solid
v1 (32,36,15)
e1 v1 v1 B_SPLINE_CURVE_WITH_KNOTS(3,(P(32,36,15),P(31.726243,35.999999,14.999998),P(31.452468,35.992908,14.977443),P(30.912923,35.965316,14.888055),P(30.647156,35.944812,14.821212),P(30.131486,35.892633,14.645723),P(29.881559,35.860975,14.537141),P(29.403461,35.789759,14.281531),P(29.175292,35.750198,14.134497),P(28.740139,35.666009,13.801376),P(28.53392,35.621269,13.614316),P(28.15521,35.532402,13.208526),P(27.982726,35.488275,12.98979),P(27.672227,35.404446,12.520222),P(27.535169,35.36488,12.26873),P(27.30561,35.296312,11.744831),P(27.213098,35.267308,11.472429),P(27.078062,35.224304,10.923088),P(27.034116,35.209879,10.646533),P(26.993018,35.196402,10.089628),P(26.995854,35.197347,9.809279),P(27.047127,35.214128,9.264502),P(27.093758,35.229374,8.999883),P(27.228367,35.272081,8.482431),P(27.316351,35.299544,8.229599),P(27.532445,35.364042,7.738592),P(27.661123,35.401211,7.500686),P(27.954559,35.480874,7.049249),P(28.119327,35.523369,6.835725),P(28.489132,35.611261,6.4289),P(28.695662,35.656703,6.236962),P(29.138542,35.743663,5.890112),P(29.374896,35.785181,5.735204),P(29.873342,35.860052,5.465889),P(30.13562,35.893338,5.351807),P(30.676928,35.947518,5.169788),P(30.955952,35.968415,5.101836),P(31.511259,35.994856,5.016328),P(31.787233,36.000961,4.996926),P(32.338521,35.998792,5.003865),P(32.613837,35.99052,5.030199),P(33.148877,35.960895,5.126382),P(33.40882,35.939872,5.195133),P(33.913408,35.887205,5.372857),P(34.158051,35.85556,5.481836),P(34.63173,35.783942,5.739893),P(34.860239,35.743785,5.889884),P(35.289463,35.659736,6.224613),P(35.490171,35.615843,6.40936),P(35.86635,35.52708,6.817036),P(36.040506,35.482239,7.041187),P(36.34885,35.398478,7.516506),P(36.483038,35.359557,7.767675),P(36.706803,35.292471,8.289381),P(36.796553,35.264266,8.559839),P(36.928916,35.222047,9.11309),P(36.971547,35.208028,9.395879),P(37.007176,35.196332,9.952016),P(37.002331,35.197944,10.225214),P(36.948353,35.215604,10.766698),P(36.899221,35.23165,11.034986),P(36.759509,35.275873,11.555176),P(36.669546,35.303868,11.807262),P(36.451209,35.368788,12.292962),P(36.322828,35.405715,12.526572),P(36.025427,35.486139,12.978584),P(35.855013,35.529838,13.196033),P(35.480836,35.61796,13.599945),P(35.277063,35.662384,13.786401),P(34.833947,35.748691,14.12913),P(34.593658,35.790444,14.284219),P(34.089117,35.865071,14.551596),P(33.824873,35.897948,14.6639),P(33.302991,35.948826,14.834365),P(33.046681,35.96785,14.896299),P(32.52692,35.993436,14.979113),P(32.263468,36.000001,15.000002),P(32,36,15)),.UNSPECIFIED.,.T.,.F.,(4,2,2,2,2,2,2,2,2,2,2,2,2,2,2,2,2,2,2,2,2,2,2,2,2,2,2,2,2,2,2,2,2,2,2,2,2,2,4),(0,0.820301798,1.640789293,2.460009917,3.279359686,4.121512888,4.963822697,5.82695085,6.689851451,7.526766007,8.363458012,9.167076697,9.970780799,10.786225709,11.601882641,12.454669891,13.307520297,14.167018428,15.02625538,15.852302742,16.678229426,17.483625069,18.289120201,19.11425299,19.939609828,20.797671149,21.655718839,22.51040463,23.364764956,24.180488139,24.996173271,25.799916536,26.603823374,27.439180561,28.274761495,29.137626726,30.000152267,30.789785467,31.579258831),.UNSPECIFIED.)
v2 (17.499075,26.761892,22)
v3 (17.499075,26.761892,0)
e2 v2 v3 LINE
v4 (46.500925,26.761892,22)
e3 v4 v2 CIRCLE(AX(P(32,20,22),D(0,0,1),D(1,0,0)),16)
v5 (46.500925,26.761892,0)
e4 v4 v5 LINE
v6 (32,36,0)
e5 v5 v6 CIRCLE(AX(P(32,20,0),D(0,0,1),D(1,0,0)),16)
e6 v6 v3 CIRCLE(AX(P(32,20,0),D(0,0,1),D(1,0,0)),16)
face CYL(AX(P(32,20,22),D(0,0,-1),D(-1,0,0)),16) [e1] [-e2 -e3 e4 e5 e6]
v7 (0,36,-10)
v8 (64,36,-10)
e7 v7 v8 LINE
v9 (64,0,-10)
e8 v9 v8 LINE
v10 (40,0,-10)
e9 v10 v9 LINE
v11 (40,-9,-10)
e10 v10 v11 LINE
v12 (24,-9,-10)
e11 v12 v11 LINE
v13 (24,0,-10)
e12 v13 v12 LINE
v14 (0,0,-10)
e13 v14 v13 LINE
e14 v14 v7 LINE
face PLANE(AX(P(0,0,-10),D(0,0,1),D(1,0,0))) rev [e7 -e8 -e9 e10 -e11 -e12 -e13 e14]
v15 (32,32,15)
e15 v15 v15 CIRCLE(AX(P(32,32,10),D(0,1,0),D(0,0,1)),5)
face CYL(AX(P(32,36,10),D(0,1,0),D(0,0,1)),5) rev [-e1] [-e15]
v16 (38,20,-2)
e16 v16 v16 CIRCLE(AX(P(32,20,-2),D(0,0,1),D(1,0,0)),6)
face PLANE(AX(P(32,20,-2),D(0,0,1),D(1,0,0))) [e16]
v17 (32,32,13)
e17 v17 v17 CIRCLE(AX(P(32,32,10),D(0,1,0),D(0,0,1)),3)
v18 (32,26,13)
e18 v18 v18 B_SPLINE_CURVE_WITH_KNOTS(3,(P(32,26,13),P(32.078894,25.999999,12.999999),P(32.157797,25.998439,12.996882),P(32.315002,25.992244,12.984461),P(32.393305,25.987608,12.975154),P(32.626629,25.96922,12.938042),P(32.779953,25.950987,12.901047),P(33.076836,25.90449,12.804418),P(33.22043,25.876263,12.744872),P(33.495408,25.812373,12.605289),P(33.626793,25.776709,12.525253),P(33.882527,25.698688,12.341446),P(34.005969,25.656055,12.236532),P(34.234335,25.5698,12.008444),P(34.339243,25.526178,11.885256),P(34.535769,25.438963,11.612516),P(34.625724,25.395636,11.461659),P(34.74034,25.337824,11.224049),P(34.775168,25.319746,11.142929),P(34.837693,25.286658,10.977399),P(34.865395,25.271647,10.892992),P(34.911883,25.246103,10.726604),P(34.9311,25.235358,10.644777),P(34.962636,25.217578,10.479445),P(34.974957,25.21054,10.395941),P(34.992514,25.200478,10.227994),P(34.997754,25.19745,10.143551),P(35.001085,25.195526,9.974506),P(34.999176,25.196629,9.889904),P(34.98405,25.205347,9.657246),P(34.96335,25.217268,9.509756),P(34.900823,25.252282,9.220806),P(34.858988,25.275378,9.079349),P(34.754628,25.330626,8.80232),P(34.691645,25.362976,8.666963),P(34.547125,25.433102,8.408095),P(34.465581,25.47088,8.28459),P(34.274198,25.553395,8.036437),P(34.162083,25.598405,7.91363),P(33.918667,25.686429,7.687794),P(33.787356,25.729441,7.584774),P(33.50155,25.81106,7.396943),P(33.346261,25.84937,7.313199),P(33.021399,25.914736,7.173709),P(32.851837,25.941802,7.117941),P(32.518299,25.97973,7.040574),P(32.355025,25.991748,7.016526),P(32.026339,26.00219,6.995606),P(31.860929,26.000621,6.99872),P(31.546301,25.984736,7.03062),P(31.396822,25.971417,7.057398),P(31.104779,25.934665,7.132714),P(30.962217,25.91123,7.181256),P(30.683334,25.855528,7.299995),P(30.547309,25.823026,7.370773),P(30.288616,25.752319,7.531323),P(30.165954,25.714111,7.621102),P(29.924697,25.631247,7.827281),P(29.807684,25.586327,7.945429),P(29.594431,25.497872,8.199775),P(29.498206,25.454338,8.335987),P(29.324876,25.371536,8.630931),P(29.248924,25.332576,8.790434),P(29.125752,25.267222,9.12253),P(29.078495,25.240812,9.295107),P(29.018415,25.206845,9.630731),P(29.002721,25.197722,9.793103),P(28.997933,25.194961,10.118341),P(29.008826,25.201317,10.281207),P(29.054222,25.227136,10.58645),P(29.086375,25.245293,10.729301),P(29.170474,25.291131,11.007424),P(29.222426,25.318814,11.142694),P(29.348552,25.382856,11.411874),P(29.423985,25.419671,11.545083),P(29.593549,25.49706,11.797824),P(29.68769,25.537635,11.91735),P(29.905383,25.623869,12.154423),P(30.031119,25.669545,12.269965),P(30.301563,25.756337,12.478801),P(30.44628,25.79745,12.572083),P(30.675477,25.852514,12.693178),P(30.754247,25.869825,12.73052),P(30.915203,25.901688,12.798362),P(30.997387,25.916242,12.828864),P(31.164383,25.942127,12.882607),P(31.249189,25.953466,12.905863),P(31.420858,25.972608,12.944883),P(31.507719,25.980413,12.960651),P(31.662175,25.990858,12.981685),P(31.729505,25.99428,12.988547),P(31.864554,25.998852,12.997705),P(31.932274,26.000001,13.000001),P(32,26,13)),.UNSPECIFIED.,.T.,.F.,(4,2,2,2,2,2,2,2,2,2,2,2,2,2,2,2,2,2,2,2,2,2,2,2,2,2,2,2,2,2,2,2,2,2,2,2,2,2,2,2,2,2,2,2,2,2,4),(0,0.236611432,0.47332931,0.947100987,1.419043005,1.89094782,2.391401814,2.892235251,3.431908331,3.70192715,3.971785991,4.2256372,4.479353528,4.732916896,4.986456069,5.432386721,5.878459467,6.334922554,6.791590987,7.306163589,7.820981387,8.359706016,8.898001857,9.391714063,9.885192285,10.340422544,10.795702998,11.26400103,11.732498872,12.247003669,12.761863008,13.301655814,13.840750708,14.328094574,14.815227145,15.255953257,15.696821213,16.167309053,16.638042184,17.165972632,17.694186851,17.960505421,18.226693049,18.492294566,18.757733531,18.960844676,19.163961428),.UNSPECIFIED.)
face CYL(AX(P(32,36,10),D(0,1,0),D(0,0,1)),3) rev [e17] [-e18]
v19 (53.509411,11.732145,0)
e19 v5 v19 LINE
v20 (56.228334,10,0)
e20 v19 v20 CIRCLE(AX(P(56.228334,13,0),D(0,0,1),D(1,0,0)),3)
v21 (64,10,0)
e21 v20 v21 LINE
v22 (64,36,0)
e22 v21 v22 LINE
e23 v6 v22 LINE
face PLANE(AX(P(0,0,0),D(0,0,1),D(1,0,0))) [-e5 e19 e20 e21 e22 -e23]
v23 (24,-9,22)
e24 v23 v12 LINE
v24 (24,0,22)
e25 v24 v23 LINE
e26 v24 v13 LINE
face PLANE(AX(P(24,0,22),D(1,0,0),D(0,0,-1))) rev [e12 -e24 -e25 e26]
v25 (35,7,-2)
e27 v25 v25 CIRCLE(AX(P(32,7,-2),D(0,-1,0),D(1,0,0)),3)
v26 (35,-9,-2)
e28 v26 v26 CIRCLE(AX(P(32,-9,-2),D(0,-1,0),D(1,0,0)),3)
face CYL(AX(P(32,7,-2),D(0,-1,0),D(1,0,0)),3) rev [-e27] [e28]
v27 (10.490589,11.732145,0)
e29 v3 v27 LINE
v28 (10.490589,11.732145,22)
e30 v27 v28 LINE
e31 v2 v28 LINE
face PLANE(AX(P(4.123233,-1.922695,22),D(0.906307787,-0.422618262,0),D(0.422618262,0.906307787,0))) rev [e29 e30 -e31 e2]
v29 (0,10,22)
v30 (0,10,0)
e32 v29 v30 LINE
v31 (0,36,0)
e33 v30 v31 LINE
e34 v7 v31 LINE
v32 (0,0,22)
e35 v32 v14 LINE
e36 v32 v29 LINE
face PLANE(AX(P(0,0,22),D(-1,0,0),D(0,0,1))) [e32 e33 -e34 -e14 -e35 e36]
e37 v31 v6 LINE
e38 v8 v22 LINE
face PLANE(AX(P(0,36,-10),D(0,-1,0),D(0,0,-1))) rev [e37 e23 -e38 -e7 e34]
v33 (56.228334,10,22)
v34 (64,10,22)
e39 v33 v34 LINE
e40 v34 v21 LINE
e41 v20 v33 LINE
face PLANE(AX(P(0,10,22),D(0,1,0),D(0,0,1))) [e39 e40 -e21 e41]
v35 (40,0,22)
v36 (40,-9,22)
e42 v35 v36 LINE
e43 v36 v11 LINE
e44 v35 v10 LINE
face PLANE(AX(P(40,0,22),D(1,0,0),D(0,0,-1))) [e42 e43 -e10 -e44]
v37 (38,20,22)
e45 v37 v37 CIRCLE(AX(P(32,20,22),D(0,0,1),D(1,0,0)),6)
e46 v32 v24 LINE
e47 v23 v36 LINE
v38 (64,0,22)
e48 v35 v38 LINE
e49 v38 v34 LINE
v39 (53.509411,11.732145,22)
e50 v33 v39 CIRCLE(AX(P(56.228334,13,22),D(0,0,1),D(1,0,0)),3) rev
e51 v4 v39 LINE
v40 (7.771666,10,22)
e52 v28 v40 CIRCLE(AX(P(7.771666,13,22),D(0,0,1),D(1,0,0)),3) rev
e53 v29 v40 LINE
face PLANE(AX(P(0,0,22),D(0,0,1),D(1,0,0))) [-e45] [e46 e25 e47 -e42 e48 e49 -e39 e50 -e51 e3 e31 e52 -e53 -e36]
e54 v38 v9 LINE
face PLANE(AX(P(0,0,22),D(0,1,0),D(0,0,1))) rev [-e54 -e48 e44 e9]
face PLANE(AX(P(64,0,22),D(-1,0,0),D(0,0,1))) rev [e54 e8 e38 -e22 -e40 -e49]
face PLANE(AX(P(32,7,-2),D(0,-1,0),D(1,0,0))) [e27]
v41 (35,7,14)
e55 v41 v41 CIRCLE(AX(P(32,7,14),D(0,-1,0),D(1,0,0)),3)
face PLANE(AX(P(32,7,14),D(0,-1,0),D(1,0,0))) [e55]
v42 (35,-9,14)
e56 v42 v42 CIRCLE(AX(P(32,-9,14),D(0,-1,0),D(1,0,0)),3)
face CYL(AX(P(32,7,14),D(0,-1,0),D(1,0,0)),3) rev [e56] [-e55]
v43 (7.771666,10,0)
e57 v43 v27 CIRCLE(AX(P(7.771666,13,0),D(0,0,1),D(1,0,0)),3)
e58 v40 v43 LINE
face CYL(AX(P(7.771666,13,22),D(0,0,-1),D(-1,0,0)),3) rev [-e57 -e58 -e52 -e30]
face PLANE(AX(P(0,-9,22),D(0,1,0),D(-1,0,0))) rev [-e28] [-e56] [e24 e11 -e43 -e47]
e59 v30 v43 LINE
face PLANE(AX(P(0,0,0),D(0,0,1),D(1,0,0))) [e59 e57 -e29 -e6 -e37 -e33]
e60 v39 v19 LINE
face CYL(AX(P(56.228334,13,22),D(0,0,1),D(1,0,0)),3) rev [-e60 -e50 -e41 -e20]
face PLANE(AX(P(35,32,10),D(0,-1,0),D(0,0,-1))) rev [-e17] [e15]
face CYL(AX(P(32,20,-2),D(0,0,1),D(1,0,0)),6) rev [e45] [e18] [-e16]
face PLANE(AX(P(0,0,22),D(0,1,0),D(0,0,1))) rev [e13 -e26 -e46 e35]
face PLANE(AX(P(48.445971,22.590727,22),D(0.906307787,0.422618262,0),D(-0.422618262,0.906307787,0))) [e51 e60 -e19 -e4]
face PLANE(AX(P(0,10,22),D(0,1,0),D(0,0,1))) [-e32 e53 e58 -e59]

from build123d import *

# Parameters (mm, degrees)
BOSS_EXTRUDE2_DEPTH                      = 22
BOSS_EXTRUDE3_DEPTH                      = 10
FILLET1_R                                = 3
SKETCH3_R                                = 6
CUT_EXTRUDE1_DEPTH                       = 24
SKETCH4_R                                = 3
CUT_EXTRUDE2_DEPTH                       = 16
CBORE_START                              = 32
CBORE_FOR_M12_HEX_HEAD_BOLT3_OUTLINE_R   = 5
CBORE_FOR_M12_HEX_HEAD_BOLT3_DEPTH       = 4
CBORE_START_2                            = 25.196151292
CBORE_FOR_M12_HEX_HEAD_BOLT3_2_OUTLINE_R = 3
CBORE_FOR_M12_HEX_HEAD_BOLT3_2_DEPTH     = 6.803848708


# Read off the part's stored shape, not the designer's step: CBORE for M12 Hex Head Bolt3
with BuildPart() as part:
    # Sketch2 → Boss-Extrude2 (new body)
    with BuildSketch(Plane.XY):
        with BuildLine():
            Line((9.682876715, 10), (0, 10))
            Line((0, 10), (0, 0))
            Line((0, 0), (24, 0))
            Line((24, 0), (24, -9))
            Line((24, -9), (40, -9))
            Line((40, -9), (40, 0))
            Line((40, 0), (64, 0))
            Line((64, 0), (64, 10))
            Line((64, 10), (54.317123285, 10))
            Line((54.317123285, 10), (46.500924593, 26.761892188))
            ThreePointArc((46.500924593, 26.761892188), (32, 36), (17.499075407, 26.761892188))
            Line((17.499075407, 26.761892188), (9.682876715, 10))
        make_face()
    extrude(amount=BOSS_EXTRUDE2_DEPTH)

    # Sketch2<4> → Boss-Extrude3 (add)
    with BuildSketch(Plane.XY):
        Polygon((0, 0), (24, 0), (24, -9), (40, -9), (40, 0), (64, 0), (64, 36), (0, 36), align=None)
    extrude(amount=-BOSS_EXTRUDE3_DEPTH)

    # Fillet1
    fillet1_edges = [part.edges().sort_by_distance(p)[0] for p in [
        (54.317123285, 10, 11),
        (9.682876715, 10, 11),
    ]]
    fillet(fillet1_edges, radius=FILLET1_R)

    # Sketch3 → Cut-Extrude1 (cut)
    with BuildSketch(Plane.XY.offset(22)):
        with Locations((32, 20)):
            Circle(SKETCH3_R)
    extrude(amount=-CUT_EXTRUDE1_DEPTH, mode=Mode.SUBTRACT)

    # Sketch4 → Cut-Extrude2 (cut)
    with BuildSketch(Plane.XZ.offset(9)):
        with Locations((32, 14)):
            Circle(SKETCH4_R)
        with Locations((32, -2)):
            Circle(SKETCH4_R)
    extrude(amount=-CUT_EXTRUDE2_DEPTH, mode=Mode.SUBTRACT)

    # CBORE for M12 Hex Head Bolt3 outline → CBORE for M12 Hex Head Bolt3 (cut)
    with BuildSketch(Plane(origin=(0, 0, 0), x_dir=(1, 0, 0), z_dir=(0, 1, 0)).offset(CBORE_START)):
        with Locations((32, -10)):
            Circle(CBORE_FOR_M12_HEX_HEAD_BOLT3_OUTLINE_R)
    extrude(amount=CBORE_FOR_M12_HEX_HEAD_BOLT3_DEPTH, mode=Mode.SUBTRACT)

    # CBORE for M12 Hex Head Bolt3 2 outline → CBORE for M12 Hex Head Bolt3 2 (cut)
    with BuildSketch(Plane(origin=(0, 0, 0), x_dir=(1, 0, 0), z_dir=(0, 1, 0)).offset(CBORE_START_2)):
        with Locations((32, -10)):
            Circle(CBORE_FOR_M12_HEX_HEAD_BOLT3_2_OUTLINE_R)
    extrude(amount=CBORE_FOR_M12_HEX_HEAD_BOLT3_2_DEPTH, mode=Mode.SUBTRACT)


solid = part.part
